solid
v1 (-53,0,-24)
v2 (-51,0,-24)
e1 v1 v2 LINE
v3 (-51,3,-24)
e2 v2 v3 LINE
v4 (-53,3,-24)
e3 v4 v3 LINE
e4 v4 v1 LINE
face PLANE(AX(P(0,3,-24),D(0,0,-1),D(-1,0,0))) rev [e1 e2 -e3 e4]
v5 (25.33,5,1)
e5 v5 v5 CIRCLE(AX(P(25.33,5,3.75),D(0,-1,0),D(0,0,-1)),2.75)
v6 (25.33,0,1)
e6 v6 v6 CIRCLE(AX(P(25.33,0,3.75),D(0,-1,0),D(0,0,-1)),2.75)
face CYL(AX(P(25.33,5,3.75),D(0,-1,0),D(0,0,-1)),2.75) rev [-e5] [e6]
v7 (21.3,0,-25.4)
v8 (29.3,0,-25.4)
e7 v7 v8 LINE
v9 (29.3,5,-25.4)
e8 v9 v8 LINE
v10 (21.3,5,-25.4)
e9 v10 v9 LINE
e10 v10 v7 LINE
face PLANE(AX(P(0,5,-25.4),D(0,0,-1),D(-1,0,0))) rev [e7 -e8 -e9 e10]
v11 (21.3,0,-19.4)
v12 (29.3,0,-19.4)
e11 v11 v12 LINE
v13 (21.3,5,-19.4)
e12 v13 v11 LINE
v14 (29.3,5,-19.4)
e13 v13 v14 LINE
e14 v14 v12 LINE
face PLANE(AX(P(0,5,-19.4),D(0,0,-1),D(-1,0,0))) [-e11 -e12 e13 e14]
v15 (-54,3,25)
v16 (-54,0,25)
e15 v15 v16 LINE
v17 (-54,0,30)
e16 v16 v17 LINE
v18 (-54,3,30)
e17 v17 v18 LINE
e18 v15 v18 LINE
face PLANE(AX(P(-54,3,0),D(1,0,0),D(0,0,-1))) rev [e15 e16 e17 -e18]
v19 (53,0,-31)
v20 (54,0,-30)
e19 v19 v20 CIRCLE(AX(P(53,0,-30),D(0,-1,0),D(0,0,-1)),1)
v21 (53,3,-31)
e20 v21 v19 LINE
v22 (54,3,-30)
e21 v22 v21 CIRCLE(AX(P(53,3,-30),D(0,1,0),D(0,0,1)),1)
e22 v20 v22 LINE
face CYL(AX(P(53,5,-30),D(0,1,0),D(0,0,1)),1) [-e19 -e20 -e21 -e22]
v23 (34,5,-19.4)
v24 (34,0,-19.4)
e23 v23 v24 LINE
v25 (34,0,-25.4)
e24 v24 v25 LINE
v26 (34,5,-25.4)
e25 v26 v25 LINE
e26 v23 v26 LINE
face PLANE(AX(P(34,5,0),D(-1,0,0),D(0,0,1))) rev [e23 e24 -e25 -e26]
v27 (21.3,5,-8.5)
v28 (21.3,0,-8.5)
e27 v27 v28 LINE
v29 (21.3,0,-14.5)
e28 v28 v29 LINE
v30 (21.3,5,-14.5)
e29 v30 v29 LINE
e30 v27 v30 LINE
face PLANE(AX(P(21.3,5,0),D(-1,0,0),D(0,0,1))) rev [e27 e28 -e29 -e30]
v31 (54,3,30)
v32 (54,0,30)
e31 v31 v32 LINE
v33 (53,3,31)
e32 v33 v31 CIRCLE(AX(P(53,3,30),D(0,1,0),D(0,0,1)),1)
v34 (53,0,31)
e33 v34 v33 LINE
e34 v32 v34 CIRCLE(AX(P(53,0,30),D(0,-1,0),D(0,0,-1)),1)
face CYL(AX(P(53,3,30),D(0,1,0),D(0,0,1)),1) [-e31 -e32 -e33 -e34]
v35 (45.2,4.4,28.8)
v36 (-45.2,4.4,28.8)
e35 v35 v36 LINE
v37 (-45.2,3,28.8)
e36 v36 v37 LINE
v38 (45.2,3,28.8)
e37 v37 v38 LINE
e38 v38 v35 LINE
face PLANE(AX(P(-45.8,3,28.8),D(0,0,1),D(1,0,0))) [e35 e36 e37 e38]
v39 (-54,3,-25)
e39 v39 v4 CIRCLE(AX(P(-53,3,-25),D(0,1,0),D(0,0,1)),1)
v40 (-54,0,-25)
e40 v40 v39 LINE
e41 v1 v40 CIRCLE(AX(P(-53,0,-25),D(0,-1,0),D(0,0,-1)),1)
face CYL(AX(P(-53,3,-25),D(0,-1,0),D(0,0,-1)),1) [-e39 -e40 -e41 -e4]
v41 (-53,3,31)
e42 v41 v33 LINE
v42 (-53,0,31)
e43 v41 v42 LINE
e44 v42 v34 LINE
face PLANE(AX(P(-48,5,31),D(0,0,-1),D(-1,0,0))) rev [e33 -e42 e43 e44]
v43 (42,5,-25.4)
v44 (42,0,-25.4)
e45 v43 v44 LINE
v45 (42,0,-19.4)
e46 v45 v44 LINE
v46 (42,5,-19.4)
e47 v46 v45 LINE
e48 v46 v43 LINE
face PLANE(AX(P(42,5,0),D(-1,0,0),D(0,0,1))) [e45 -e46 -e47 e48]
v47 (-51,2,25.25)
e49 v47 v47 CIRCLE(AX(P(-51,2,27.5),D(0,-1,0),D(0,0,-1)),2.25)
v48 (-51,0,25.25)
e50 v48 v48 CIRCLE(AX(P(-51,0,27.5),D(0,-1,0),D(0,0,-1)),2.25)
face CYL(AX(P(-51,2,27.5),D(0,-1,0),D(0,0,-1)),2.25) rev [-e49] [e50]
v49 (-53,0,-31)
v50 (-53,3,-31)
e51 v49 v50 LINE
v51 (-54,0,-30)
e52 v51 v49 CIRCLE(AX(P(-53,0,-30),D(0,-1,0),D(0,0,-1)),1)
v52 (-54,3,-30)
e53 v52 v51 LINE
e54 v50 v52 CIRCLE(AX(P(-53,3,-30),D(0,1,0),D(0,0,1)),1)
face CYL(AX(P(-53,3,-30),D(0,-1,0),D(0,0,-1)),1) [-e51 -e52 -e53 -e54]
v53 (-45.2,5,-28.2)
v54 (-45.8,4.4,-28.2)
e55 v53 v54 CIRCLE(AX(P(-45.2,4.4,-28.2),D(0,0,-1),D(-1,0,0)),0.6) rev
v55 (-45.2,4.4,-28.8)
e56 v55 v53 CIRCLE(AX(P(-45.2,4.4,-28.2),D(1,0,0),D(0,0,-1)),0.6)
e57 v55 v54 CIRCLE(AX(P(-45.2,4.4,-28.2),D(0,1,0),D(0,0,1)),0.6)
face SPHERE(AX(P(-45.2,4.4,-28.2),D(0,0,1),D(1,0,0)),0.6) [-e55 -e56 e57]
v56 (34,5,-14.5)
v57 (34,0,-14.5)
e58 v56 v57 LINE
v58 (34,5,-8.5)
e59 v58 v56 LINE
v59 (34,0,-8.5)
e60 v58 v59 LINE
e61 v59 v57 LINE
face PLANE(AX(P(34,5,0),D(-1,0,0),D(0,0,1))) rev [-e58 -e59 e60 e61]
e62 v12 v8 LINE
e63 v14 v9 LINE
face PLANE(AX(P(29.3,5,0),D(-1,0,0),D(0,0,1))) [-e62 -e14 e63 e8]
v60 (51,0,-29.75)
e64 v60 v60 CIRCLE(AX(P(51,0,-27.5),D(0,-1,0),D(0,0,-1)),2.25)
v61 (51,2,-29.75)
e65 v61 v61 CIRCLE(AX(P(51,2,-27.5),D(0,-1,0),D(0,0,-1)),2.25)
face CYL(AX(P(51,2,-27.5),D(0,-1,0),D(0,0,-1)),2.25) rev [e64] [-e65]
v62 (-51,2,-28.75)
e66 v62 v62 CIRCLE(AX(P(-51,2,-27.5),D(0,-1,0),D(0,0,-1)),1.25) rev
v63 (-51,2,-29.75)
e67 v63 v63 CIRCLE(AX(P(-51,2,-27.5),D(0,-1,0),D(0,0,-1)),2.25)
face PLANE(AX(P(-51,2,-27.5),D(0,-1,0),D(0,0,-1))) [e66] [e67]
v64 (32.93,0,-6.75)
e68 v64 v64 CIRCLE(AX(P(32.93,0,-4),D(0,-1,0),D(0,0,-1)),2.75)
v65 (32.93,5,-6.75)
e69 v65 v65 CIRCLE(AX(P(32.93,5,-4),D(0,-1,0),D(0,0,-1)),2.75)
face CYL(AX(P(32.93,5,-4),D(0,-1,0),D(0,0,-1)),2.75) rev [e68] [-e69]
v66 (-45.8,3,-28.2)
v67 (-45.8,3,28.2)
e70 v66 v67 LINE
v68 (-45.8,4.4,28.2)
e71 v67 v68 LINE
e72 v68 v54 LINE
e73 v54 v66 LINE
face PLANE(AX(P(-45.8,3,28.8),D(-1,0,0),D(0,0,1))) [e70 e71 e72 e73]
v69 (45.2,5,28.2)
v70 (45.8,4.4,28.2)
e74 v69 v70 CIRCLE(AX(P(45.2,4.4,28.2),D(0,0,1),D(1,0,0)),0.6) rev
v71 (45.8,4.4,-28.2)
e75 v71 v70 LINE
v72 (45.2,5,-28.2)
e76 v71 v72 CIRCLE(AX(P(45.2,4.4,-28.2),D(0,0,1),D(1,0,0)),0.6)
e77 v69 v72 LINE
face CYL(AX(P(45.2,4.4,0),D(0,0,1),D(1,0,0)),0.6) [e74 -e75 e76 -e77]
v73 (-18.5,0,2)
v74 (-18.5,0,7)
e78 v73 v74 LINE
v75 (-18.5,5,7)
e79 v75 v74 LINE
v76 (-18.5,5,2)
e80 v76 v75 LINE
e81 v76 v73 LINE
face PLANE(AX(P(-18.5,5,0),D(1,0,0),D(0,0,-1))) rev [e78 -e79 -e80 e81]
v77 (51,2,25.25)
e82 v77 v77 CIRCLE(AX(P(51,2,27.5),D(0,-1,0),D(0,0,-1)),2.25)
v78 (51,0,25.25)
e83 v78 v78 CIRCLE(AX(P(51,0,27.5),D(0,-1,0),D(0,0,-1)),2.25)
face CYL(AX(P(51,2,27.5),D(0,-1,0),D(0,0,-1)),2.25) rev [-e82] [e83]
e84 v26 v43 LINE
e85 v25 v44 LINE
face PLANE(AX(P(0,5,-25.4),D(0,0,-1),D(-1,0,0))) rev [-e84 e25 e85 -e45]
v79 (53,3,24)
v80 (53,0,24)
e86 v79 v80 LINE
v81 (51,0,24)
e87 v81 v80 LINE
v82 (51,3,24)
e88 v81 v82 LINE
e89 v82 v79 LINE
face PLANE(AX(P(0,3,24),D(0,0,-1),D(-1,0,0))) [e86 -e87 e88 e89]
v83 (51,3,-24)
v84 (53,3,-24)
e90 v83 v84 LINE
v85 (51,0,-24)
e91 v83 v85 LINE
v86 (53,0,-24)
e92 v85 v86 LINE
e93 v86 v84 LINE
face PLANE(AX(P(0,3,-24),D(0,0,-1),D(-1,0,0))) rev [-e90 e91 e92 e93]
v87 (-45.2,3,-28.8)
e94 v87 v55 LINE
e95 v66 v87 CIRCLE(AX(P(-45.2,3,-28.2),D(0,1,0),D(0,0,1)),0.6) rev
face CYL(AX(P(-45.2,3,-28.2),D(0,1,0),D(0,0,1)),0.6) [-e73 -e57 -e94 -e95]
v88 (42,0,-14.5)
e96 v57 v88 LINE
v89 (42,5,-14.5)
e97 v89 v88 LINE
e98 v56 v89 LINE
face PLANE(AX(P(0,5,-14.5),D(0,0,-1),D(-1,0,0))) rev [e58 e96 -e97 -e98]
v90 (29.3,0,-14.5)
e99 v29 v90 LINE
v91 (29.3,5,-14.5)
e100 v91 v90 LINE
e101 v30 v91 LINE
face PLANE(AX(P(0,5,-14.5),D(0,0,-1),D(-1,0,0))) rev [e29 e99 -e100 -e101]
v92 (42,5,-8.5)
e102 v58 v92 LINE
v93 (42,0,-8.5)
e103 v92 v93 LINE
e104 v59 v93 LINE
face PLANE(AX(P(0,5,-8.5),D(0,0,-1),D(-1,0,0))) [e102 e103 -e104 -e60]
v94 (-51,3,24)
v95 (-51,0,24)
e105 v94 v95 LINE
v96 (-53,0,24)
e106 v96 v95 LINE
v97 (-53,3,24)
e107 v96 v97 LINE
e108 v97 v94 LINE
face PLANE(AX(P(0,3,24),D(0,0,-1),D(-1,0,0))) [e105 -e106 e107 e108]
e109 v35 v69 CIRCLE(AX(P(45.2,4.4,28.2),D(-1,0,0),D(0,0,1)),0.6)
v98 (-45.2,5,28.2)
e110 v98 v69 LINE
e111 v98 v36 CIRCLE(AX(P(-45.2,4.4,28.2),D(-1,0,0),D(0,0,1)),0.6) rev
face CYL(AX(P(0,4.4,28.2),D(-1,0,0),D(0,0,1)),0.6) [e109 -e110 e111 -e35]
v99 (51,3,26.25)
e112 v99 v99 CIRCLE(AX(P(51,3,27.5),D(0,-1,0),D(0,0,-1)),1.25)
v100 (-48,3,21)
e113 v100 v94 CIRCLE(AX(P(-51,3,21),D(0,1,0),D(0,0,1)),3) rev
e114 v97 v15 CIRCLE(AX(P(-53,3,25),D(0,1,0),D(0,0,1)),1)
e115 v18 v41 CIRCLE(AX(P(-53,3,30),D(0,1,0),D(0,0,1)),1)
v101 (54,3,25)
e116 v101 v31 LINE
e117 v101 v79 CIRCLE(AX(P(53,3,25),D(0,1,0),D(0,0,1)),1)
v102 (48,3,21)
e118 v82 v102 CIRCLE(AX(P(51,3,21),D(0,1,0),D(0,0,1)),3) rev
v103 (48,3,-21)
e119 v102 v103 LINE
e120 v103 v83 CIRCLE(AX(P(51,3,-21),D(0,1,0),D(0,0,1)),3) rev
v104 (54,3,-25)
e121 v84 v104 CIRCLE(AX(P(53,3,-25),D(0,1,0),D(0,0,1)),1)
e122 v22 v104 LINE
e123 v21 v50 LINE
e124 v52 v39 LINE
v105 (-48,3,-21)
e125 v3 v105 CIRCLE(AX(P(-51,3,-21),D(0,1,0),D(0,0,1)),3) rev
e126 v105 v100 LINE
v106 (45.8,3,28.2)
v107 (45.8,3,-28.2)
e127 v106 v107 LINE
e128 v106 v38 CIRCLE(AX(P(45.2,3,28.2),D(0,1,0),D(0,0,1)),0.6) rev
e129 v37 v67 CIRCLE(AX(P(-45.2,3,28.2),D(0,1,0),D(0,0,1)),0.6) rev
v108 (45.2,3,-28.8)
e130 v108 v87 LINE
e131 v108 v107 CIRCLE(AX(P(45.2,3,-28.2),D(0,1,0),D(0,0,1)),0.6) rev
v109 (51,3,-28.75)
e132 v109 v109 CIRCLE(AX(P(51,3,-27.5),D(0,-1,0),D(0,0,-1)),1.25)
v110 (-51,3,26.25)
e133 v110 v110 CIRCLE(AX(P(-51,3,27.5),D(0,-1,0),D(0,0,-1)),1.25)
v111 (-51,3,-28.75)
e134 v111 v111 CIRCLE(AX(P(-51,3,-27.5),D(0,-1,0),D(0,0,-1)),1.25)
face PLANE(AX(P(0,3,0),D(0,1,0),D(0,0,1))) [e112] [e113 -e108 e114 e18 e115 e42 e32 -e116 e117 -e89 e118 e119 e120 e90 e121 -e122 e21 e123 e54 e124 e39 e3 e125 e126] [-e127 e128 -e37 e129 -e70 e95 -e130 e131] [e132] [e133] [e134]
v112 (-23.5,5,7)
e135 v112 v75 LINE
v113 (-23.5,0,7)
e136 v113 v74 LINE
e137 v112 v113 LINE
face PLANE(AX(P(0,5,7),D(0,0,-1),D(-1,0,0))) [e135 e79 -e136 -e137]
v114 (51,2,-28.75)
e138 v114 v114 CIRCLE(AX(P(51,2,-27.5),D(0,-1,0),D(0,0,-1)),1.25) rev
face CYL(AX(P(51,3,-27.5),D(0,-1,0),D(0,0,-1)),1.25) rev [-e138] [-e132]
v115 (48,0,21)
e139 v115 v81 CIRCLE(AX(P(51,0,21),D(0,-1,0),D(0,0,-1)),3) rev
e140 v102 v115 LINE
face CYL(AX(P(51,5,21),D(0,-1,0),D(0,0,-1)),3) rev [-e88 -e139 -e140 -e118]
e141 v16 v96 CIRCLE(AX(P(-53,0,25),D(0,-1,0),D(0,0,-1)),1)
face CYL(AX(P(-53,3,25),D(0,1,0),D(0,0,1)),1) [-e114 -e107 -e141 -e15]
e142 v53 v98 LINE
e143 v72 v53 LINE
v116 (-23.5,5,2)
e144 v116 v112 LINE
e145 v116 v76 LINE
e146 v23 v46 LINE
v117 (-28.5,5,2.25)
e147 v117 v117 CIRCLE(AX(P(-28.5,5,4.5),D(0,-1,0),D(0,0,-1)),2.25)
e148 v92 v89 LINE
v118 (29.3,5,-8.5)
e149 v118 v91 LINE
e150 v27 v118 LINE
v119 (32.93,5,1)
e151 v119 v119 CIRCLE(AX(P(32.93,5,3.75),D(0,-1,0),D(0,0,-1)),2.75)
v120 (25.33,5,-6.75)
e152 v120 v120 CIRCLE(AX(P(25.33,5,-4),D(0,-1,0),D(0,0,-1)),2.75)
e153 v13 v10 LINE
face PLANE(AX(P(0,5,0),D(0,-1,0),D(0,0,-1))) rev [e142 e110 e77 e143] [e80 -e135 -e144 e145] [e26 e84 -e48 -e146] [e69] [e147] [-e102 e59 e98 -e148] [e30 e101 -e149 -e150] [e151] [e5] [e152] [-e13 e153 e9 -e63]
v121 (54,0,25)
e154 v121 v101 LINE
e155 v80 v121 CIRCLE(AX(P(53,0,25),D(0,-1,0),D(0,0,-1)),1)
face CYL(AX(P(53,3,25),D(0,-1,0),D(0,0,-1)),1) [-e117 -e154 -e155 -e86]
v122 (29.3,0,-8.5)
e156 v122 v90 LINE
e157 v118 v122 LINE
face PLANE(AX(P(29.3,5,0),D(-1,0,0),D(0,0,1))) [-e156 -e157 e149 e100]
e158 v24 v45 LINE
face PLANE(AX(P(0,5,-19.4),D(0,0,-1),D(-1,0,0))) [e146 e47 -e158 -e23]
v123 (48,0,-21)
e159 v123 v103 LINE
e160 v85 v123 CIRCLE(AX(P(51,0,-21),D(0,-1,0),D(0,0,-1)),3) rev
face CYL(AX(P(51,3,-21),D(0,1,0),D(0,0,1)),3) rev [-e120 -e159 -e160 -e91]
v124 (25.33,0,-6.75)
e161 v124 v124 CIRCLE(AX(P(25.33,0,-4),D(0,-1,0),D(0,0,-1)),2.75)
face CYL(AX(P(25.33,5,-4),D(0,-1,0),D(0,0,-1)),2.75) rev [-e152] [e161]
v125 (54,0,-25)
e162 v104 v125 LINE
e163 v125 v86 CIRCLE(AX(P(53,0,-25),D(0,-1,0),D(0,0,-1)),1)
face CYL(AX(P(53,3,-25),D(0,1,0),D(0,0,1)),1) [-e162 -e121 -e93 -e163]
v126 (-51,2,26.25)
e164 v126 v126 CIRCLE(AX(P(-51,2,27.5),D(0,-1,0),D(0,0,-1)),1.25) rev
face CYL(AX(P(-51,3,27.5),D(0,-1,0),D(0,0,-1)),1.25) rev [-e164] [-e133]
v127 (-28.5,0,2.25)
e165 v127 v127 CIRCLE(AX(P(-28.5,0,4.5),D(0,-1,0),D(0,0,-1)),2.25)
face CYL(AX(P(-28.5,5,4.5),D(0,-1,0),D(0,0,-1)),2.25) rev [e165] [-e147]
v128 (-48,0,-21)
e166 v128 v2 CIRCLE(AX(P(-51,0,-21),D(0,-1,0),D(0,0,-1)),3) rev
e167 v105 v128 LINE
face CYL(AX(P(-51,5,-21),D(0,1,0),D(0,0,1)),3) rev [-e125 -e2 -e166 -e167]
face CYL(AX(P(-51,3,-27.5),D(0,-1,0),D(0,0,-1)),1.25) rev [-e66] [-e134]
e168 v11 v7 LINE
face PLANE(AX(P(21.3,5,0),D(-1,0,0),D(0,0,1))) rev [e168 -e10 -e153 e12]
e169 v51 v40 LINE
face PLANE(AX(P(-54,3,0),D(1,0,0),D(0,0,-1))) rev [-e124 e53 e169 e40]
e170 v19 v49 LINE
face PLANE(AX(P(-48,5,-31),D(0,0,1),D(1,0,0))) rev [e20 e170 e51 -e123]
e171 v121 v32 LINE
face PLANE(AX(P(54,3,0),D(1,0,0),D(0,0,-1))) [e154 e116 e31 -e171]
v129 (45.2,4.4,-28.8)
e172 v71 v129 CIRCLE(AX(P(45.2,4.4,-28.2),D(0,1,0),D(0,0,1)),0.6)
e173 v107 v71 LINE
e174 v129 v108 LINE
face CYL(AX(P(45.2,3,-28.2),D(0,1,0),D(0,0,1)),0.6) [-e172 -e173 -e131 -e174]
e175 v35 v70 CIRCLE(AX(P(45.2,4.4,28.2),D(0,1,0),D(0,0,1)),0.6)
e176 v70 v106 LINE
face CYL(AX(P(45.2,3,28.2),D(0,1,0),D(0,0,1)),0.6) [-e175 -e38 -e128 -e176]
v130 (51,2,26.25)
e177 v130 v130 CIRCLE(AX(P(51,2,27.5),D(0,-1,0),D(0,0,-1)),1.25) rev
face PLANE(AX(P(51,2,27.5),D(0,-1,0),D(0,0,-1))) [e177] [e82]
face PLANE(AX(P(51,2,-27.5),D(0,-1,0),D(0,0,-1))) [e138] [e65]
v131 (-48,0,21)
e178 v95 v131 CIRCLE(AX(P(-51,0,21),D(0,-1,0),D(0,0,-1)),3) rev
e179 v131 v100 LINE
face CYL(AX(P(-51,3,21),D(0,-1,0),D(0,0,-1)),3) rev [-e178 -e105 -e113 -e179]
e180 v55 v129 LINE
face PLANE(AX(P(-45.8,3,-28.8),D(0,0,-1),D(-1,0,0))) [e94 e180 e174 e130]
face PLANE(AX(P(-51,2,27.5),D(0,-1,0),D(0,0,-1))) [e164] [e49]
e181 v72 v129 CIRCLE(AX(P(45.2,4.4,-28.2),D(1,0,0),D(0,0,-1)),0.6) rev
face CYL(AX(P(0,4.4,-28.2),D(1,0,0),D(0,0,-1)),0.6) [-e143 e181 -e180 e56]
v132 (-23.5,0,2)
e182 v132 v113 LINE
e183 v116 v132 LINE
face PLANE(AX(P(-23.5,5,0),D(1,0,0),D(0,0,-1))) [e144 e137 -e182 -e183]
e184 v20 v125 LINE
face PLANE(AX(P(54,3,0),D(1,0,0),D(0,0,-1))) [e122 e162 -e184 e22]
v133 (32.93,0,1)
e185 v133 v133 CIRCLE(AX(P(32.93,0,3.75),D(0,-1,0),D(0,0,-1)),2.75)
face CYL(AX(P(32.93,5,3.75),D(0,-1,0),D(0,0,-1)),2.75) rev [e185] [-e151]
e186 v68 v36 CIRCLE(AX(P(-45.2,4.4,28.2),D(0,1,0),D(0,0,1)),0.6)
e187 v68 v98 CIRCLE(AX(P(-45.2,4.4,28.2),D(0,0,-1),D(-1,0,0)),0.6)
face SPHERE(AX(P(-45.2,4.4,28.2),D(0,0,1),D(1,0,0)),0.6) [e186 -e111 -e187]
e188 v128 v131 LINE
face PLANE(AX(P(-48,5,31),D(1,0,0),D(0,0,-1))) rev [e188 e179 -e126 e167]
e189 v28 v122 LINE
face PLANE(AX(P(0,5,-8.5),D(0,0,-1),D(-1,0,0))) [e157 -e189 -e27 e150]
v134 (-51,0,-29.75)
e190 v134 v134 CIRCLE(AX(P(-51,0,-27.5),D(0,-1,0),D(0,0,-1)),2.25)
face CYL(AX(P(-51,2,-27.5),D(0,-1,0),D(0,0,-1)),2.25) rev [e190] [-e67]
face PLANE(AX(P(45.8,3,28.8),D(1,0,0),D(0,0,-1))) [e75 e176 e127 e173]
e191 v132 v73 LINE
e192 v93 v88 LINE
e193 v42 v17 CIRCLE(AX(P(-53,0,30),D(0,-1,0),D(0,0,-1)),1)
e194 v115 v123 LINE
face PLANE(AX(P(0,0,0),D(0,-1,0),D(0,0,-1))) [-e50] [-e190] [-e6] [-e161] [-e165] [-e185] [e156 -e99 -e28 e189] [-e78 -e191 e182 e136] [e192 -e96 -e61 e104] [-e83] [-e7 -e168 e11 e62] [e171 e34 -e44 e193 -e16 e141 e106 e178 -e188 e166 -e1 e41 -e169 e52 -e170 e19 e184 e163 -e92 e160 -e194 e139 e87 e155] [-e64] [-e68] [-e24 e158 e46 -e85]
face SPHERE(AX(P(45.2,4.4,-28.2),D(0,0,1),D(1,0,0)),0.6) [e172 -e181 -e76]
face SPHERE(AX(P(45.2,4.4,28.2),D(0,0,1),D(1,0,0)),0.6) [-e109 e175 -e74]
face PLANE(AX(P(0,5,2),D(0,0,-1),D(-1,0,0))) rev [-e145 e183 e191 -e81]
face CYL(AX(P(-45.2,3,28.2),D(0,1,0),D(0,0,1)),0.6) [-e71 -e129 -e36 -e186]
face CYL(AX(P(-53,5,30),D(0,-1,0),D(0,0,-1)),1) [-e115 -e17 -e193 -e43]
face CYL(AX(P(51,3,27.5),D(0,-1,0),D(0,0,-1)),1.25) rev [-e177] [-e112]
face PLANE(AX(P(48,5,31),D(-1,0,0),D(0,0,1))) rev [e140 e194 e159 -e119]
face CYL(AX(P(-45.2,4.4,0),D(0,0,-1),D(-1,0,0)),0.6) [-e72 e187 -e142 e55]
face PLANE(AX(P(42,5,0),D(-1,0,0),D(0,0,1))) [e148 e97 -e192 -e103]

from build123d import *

# Parameters (mm, degrees)
SKETCH_1_W          = 96
SKETCH_1_H          = 62
EXTRUDE_1_DEPTH     = 5
SKETCH_2_W          = 96
SKETCH_2_H          = 62
SKETCH_2_W_2        = 91.6
SKETCH_2_H_2        = 57.6
CUT_EXTRUDE_1_DEPTH = 2
EXTRUDE_2_DEPTH     = 3
FILLET_1_R          = 3
FILLET_2_R          = 1
FILLET_3_R          = 0.6
FILLET_4_R          = 0.6
SKETCH_5_R          = 2.25
CUT_EXTRUDE_2_DEPTH = 2
SKETCH_6_R          = 2.25
SKETCH_6_W          = 5
SKETCH_6_H          = 5
SKETCH_6_R_2        = 2.75
SKETCH_6_W_2        = 8
SKETCH_6_H_2        = 6
CUT_EXTRUDE_3_DEPTH = 63.465990747


with BuildPart() as part:
    # Эскиз1 → Бобышка-Вытянуть1 (new body)
    with BuildSketch(Plane(origin=(0, 0, 0), x_dir=(1, 0, 0), z_dir=(0, 1, 0))):
        Rectangle(SKETCH_1_W, SKETCH_1_H)
    extrude(amount=EXTRUDE_1_DEPTH)

    # Эскиз2 → Вырез-Вытянуть1 (cut)
    with BuildSketch(Plane(origin=(0, 5, 0), x_dir=(1, 0, 0), z_dir=(0, 1, 0))):
        Rectangle(SKETCH_2_W, SKETCH_2_H)
        Rectangle(SKETCH_2_W_2, SKETCH_2_H_2, mode=Mode.SUBTRACT)
    extrude(amount=-CUT_EXTRUDE_1_DEPTH, mode=Mode.SUBTRACT)

    # Эскиз4 → Бобышка-Вытянуть2 (add)
    with BuildSketch(Plane.XZ):
        with BuildLine():
            Line((-54, 31), (-54, 24))
            Line((-54, 24), (-51, 24))
            Line((-51, 24), (-51, 26.25))
            ThreePointArc((-51, 26.25), (-51.883883476, 28.383883476), (-49.75, 27.5))
            Line((-49.75, 27.5), (-48, 27.5))
            Line((-48, 27.5), (-48, 31))
            Line((-48, 31), (-54, 31))
        make_face()
        with BuildLine():
            Line((-51, 26.25), (-51, 24))
            Line((-51, 24), (-48, 24))
            Line((-48, 24), (-48, 27.5))
            Line((-48, 27.5), (-49.75, 27.5))
            ThreePointArc((-49.75, 27.5), (-50.116116524, 26.616116524), (-51, 26.25))
        make_face()
        with BuildLine():
            Line((-54, -24), (-54, -31))
            Line((-54, -31), (-48, -31))
            Line((-48, -31), (-48, -27.5))
            Line((-48, -27.5), (-49.75, -27.5))
            ThreePointArc((-49.75, -27.5), (-51.883883476, -28.383883476), (-51, -26.25))
            Line((-51, -26.25), (-51, -24))
            Line((-51, -24), (-54, -24))
        make_face()
        with BuildLine():
            Line((-49.75, -27.5), (-48, -27.5))
            Line((-48, -27.5), (-48, -24))
            Line((-48, -24), (-51, -24))
            Line((-51, -24), (-51, -26.25))
            ThreePointArc((-51, -26.25), (-50.116116524, -26.616116524), (-49.75, -27.5))
        make_face()
        with BuildLine():
            Line((48, -27.5), (48, -31))
            Line((48, -31), (54, -31))
            Line((54, -31), (54, -24))
            Line((54, -24), (51, -24))
            Line((51, -24), (51, -26.25))
            ThreePointArc((51, -26.25), (51.883883476, -26.616116524), (52.25, -27.5))
            ThreePointArc((52.25, -27.5), (51, -28.75), (49.75, -27.5))
            Line((49.75, -27.5), (48, -27.5))
        make_face()
        with BuildLine():
            Line((48, -24), (48, -27.5))
            Line((48, -27.5), (49.75, -27.5))
            ThreePointArc((49.75, -27.5), (50.116116524, -26.616116524), (51, -26.25))
            Line((51, -26.25), (51, -24))
            Line((51, -24), (48, -24))
        make_face()
        with BuildLine():
            Line((51, 24), (54, 24))
            Line((54, 24), (54, 31))
            Line((54, 31), (48, 31))
            Line((48, 31), (48, 27.5))
            Line((48, 27.5), (49.75, 27.5))
            ThreePointArc((49.75, 27.5), (51, 28.75), (52.25, 27.5))
            ThreePointArc((52.25, 27.5), (51.883883476, 26.616116524), (51, 26.25))
            Line((51, 26.25), (51, 24))
        make_face()
        with BuildLine():
            Line((48, 27.5), (48, 24))
            Line((48, 24), (51, 24))
            Line((51, 24), (51, 26.25))
            ThreePointArc((51, 26.25), (50.116116524, 26.616116524), (49.75, 27.5))
            Line((49.75, 27.5), (48, 27.5))
        make_face()
    extrude(amount=-EXTRUDE_2_DEPTH)

    # Скругление1
    fillet_1_edges = [part.edges().sort_by_distance(p)[0] for p in [
        (-48, 1.5, 24),
        (-48, 1.5, -24),
        (48, 1.5, -24),
        (48, 1.5, 24),
    ]]
    fillet(fillet_1_edges, radius=FILLET_1_R)

    # Скругление2
    fillet_2_edges = [part.edges().sort_by_distance(p)[0] for p in [
        (-54, 1.5, 24),
        (-54, 1.5, 31),
        (-54, 1.5, -31),
        (-54, 1.5, -24),
        (54, 1.5, -24),
        (54, 1.5, -31),
        (54, 1.5, 31),
        (54, 1.5, 24),
    ]]
    fillet(fillet_2_edges, radius=FILLET_2_R)

    # Скругление3
    fillet_3_edges = [part.edges().sort_by_distance(p)[0] for p in [
        (45.8, 5, 0),
        (0, 5, 28.8),
        (-45.8, 5, 0),
        (0, 5, -28.8),
    ]]
    fillet(fillet_3_edges, radius=FILLET_3_R)

    # Скругление4
    # the kernel refuses this fillet: 0.6 mm, written as the material it takes off along each edge
    with BuildSketch(Plane(origin=(-45.2, 4.4, -28.2), x_dir=(0, 0, -1), z_dir=(-1, 0, 0))) as fillet_4_piece_1_section:
        Polygon((0, 0), (FILLET_4_R * 1.02, 0), (FILLET_4_R * 1.02, -FILLET_4_R * 1.02), (0, -FILLET_4_R * 1.02), align=None)
    fillet_4_piece_1 = extrude(amount=FILLET_4_R * 1.02, mode=Mode.PRIVATE)
    fillet_4_piece_1 = fillet_4_piece_1 - Plane(origin=(-45.2, 4.4, -28.2), x_dir=(0, -0.7071067811865475, 0.7071067811865475), z_dir=(-1, 0, 0)) * Sphere(FILLET_4_R, mode=Mode.PRIVATE)
    add(fillet_4_piece_1, mode=Mode.SUBTRACT)
    with BuildSketch(Plane(origin=(45.2, 4.4, -28.2), x_dir=(1, 0, 0), z_dir=(0, 0, -1))) as fillet_4_piece_2_section:
        Polygon((0, 0), (FILLET_4_R * 1.02, 0), (FILLET_4_R * 1.02, -FILLET_4_R * 1.02), (0, -FILLET_4_R * 1.02), align=None)
    fillet_4_piece_2 = extrude(amount=FILLET_4_R * 1.02, mode=Mode.PRIVATE)
    fillet_4_piece_2 = fillet_4_piece_2 - Plane(origin=(45.2, 4.4, -28.2), x_dir=(-0.7071067811865475, -0.7071067811865475, 0), z_dir=(0, 0, -1)) * Sphere(FILLET_4_R, mode=Mode.PRIVATE)
    add(fillet_4_piece_2, mode=Mode.SUBTRACT)
    with BuildSketch(Plane(origin=(-45.2, 4.4, 28.2), x_dir=(0, 0, 1), z_dir=(-1, 0, 0))) as fillet_4_piece_3_section:
        Polygon((0, 0), (FILLET_4_R * 1.02, 0), (FILLET_4_R * 1.02, FILLET_4_R * 1.02), (0, FILLET_4_R * 1.02), align=None)
    fillet_4_piece_3 = extrude(amount=FILLET_4_R * 1.02, mode=Mode.PRIVATE)
    fillet_4_piece_3 = fillet_4_piece_3 - Plane(origin=(-45.2, 4.4, 28.2), x_dir=(0, -0.7071067811865475, -0.7071067811865475), z_dir=(-1, 0, 0)) * Sphere(FILLET_4_R, mode=Mode.PRIVATE)
    add(fillet_4_piece_3, mode=Mode.SUBTRACT)
    with BuildSketch(Plane(origin=(45.2, 4.4, 28.2), x_dir=(1, 0, 0), z_dir=(0, 0, 1))) as fillet_4_piece_4_section:
        Polygon((0, 0), (FILLET_4_R * 1.02, 0), (FILLET_4_R * 1.02, FILLET_4_R * 1.02), (0, FILLET_4_R * 1.02), align=None)
    fillet_4_piece_4 = extrude(amount=FILLET_4_R * 1.02, mode=Mode.PRIVATE)
    fillet_4_piece_4 = fillet_4_piece_4 - Plane(origin=(45.2, 4.4, 28.2), x_dir=(-0.7071067811865475, -0.7071067811865475, 0), z_dir=(0, 0, 1)) * Sphere(FILLET_4_R, mode=Mode.PRIVATE)
    add(fillet_4_piece_4, mode=Mode.SUBTRACT)
    with BuildSketch(Plane(origin=(45.8, 4.4, 28.8), x_dir=(-1, 0, 0), z_dir=(0, -1, 0)), Plane(origin=(-45.8, 4.4, 28.8), x_dir=(0, 0, -1), z_dir=(0, -1, 0))) as fillet_4_piece_5:
        with BuildLine():
            CenterArc((FILLET_4_R, FILLET_4_R), FILLET_4_R, 180, 90)
            Line((0, FILLET_4_R), (0, 0))
            Line((0, 0), (FILLET_4_R, 0))
        make_face()
    extrude(amount=1.4, mode=Mode.SUBTRACT)
    with BuildSketch(Plane(origin=(-45.8, 4.4, -28.8), x_dir=(0, 0, 1), z_dir=(0, -1, 0)), Plane(origin=(45.8, 4.4, -28.8), x_dir=(-1, 0, 0), z_dir=(0, -1, 0))) as fillet_4_piece_6:
        with BuildLine():
            CenterArc((FILLET_4_R, -FILLET_4_R), FILLET_4_R, 90, 90)
            Line((0, -FILLET_4_R), (0, 0))
            Line((0, 0), (FILLET_4_R, 0))
        make_face()
    extrude(amount=1.4, mode=Mode.SUBTRACT)

    # Эскиз5 → Вырез-Вытянуть2 (cut)
    with BuildSketch(Plane.XZ):
        with Locations(Location((-51, 27.5, 0), (0, 0, 270))):
            Circle(SKETCH_5_R)
        with Locations(Location((51, 27.5, 0), (0, 0, 270))):
            Circle(SKETCH_5_R)
        with Locations(Location((-51, -27.5, 0), (0, 0, 270))):
            Circle(SKETCH_5_R)
        with Locations(Location((51, -27.5, 0), (0, 0, 270))):
            Circle(SKETCH_5_R)
    extrude(amount=-CUT_EXTRUDE_2_DEPTH, mode=Mode.SUBTRACT)

    # Эскиз6 → Вырез-Вытянуть3 (cut, through all)
    with BuildSketch(Plane.XZ):
        with Locations(Location((-28.5, 4.5, 0), (0, 0, 270))):
            Circle(SKETCH_6_R)
        with Locations((-21, 4.5)):
            Rectangle(SKETCH_6_W, SKETCH_6_H)
        with Locations(Location((25.33, -4, 0), (0, 0, 270))):
            Circle(SKETCH_6_R_2)
        with Locations(Location((32.93, -4, 0), (0, 0, 270))):
            Circle(SKETCH_6_R_2)
        with Locations(Location((32.93, 3.75, 0), (0, 0, 270))):
            Circle(SKETCH_6_R_2)
        with Locations(Location((25.33, 3.75, 0), (0, 0, 270))):
            Circle(SKETCH_6_R_2)
        with Locations((25.3, -11.5)):
            Rectangle(SKETCH_6_W_2, SKETCH_6_H_2)
        with Locations((25.3, -22.4)):
            Rectangle(SKETCH_6_W_2, SKETCH_6_H_2)
        with Locations((38, -22.4)):
            Rectangle(SKETCH_6_W_2, SKETCH_6_H_2)
        with Locations((38, -11.5)):
            Rectangle(SKETCH_6_W_2, SKETCH_6_H_2)
    extrude(amount=-CUT_EXTRUDE_3_DEPTH, mode=Mode.SUBTRACT)


solid = part.part
